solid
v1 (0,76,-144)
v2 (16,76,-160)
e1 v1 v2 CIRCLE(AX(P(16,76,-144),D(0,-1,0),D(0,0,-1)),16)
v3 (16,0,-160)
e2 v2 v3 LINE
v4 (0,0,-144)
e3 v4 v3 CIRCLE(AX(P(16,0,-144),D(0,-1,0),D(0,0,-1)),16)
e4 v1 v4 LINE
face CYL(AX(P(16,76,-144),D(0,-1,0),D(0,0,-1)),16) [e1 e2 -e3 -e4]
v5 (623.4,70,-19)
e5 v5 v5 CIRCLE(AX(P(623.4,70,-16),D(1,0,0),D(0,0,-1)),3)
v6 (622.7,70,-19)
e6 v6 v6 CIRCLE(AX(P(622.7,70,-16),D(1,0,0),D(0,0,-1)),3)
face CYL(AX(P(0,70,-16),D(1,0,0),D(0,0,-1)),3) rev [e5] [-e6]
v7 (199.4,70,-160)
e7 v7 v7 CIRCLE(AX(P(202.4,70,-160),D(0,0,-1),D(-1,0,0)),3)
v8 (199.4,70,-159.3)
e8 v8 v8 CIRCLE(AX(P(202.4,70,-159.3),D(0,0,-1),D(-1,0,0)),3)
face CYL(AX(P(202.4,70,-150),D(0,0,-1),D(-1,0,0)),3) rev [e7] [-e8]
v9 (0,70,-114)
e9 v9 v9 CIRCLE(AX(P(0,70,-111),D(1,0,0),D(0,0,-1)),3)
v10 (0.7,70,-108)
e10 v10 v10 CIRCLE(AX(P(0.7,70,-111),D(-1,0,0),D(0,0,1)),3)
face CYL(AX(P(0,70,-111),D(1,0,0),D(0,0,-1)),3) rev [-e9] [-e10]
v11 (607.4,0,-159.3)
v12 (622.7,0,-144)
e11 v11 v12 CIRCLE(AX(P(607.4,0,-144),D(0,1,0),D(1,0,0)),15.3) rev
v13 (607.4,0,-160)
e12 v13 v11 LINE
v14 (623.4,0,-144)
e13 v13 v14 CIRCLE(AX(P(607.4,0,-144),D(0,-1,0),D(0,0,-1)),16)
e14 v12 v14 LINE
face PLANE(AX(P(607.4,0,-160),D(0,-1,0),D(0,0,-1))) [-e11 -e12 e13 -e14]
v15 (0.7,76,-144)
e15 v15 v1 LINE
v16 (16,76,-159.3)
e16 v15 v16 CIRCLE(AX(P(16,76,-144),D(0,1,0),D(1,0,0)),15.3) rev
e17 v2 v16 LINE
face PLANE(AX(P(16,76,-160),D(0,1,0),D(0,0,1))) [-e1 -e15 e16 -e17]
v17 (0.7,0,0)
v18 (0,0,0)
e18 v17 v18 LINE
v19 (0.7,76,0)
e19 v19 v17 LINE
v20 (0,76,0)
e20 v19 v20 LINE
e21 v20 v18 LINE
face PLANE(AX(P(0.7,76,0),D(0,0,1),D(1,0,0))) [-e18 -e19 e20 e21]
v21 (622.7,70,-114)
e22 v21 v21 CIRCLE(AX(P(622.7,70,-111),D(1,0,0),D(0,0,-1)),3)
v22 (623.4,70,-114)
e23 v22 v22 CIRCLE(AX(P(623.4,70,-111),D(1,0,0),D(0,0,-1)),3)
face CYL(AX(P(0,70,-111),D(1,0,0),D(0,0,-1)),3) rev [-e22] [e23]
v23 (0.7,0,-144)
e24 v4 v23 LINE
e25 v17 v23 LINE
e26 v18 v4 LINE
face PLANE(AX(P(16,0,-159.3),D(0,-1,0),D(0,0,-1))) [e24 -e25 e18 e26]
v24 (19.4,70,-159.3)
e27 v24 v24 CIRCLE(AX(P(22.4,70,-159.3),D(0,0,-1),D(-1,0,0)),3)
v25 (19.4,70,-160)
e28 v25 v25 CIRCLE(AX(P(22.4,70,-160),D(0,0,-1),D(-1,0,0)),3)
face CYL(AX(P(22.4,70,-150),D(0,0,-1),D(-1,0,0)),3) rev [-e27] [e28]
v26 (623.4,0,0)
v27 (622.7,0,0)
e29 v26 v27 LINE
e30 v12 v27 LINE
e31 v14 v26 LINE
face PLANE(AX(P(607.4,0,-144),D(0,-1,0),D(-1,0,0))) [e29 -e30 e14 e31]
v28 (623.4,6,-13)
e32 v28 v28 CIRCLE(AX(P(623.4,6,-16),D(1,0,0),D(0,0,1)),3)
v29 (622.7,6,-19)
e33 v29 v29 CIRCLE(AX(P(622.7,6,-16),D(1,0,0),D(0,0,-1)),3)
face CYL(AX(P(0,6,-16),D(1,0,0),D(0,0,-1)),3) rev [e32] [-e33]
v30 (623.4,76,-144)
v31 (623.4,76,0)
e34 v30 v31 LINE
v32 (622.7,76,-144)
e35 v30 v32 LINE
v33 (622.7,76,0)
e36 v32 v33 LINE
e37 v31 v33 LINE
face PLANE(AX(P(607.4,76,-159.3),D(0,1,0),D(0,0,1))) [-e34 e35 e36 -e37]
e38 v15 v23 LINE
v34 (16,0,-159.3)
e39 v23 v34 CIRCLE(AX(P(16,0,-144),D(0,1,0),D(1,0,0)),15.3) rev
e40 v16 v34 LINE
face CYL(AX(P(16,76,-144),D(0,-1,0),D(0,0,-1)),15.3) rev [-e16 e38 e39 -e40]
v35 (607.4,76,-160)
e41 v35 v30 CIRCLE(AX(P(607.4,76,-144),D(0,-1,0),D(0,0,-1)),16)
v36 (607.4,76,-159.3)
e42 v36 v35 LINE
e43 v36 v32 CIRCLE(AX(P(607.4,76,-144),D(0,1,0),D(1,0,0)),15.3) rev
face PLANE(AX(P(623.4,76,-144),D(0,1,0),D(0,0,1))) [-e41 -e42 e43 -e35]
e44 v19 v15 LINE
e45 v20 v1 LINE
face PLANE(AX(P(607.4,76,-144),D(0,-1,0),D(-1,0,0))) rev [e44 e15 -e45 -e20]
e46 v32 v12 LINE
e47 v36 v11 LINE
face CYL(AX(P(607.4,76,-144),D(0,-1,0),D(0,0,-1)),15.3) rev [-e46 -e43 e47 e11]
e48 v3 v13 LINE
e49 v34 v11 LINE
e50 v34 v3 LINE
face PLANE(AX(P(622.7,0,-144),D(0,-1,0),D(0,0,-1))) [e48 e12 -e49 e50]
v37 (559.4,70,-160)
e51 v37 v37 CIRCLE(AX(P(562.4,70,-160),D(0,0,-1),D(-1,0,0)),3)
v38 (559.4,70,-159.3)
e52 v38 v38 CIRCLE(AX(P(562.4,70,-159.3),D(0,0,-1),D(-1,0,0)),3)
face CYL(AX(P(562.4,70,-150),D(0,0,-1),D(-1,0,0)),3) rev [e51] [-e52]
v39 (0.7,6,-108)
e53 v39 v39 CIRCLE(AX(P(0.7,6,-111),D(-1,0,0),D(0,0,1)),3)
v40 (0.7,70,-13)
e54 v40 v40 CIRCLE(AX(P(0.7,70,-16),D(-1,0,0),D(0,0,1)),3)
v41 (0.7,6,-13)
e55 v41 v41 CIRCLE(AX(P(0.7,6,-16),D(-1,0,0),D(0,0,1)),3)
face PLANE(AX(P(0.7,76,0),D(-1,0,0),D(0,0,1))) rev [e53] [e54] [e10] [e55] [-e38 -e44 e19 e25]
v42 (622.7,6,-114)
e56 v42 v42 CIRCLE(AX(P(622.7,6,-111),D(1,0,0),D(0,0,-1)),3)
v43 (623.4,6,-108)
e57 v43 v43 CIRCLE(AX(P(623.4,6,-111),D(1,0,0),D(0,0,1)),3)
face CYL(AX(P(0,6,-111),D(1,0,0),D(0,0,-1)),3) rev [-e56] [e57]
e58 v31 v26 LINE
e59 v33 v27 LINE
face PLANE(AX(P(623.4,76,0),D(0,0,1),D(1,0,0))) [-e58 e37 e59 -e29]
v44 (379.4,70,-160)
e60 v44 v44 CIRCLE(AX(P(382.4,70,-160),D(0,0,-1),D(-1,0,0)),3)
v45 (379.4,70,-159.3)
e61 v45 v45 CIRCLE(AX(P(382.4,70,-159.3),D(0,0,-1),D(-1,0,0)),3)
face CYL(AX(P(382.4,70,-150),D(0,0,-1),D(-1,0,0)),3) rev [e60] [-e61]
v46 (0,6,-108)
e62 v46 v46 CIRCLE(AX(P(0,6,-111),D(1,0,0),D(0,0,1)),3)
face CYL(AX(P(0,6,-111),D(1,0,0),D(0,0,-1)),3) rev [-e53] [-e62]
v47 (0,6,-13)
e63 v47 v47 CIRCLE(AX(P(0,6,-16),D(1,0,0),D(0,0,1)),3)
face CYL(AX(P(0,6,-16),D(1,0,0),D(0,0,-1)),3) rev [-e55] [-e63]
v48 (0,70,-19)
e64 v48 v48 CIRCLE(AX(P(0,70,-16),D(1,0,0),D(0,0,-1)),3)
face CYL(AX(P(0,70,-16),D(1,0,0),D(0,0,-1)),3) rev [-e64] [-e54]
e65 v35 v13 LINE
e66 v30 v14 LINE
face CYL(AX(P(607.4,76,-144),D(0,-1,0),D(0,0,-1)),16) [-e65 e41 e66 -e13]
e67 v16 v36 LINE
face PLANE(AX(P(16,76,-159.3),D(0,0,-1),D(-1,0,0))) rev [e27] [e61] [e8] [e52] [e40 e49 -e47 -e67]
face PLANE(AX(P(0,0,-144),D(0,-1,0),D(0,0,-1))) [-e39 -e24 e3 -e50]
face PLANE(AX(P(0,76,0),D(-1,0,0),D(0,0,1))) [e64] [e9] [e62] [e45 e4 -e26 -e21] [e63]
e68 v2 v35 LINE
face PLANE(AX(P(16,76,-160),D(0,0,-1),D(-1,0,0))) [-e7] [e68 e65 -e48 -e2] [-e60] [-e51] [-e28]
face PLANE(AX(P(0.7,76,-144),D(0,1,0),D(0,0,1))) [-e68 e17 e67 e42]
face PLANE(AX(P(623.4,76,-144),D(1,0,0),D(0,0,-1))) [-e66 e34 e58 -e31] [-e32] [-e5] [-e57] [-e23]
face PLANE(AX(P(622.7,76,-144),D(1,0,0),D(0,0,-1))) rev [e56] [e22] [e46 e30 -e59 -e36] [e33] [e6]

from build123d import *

# Parameters (mm, degrees)
BASE_FLANGE1_DEPTH = 76
SKETCH2_R          = 3
CUT_EXTRUDE1_DEPTH = 649.076816435
SKETCH3_R          = 3
CUT_EXTRUDE2_DEPTH = 10


# Read off the part's stored shape, not the designer's step: Base-Flange1
with BuildPart() as part:
    # Base-Flange1 outline → Base-Flange1 (new body)
    with BuildSketch(Plane(origin=(0, 0, 0), x_dir=(1, 0, 0), z_dir=(0, 1, 0))):
        with BuildLine():
            Line((622.7, 144), (622.7, 0))
            Line((622.7, 0), (623.4, 0))
            Line((623.4, 0), (623.4, 144))
            ThreePointArc((623.4, 144), (618.713708499, 155.313708499), (607.4, 160))
            Line((607.4, 160), (16, 160))
            ThreePointArc((16, 160), (4.686291501, 155.313708499), (0, 144))
            Line((0, 144), (0, 0))
            Line((0, 0), (0.7, 0))
            Line((0.7, 0), (0.7, 144))
            ThreePointArc((0.7, 144), (5.181266248, 154.818733752), (16, 159.3))
            Line((16, 159.3), (607.4, 159.3))
            ThreePointArc((607.4, 159.3), (618.218733752, 154.818733752), (622.7, 144))
        make_face()
    extrude(amount=BASE_FLANGE1_DEPTH)

    # Sketch2 → Cut-Extrude1 (cut, through all)
    with BuildSketch(Plane(origin=(623.4, 0, 0), x_dir=(0, 0, -1), z_dir=(1, 0, 0))):
        with Locations((16, 70)):
            Circle(SKETCH2_R)
        with Locations((111, 70)):
            Circle(SKETCH2_R)
        with Locations(Location((111, 6, 0), (0, 0, 180))):
            Circle(SKETCH2_R)
        with Locations(Location((16, 6, 0), (0, 0, 180))):
            Circle(SKETCH2_R)
    extrude(amount=-CUT_EXTRUDE1_DEPTH, mode=Mode.SUBTRACT)

    # Sketch3 → Cut-Extrude2 (cut)
    with BuildSketch(Plane(origin=(0, 0, -160), x_dir=(-1, 0, 0), z_dir=(0, 0, -1))):
        with Locations((-562.4, 70)):
            Circle(SKETCH3_R)
        with Locations((-382.4, 70)):
            Circle(SKETCH3_R)
        with Locations((-202.4, 70)):
            Circle(SKETCH3_R)
        with Locations((-22.4, 70)):
            Circle(SKETCH3_R)
        with Locations((157.6, 70)):
            Circle(SKETCH3_R)
        with Locations((337.6, 70)):
            Circle(SKETCH3_R)
        with Locations((517.6, 70)):
            Circle(SKETCH3_R)
        with Locations((-382.4, -22)):
            Circle(SKETCH3_R)
        with Locations((-202.4, -22)):
            Circle(SKETCH3_R)
        with Locations((-22.4, -22)):
            Circle(SKETCH3_R)
        with Locations((157.6, -22)):
            Circle(SKETCH3_R)
        with Locations((337.6, -22)):
            Circle(SKETCH3_R)
        with Locations((517.6, -22)):
            Circle(SKETCH3_R)
        with Locations((-562.4, -22)):
            Circle(SKETCH3_R)
    extrude(amount=-CUT_EXTRUDE2_DEPTH, mode=Mode.SUBTRACT)


solid = part.part
